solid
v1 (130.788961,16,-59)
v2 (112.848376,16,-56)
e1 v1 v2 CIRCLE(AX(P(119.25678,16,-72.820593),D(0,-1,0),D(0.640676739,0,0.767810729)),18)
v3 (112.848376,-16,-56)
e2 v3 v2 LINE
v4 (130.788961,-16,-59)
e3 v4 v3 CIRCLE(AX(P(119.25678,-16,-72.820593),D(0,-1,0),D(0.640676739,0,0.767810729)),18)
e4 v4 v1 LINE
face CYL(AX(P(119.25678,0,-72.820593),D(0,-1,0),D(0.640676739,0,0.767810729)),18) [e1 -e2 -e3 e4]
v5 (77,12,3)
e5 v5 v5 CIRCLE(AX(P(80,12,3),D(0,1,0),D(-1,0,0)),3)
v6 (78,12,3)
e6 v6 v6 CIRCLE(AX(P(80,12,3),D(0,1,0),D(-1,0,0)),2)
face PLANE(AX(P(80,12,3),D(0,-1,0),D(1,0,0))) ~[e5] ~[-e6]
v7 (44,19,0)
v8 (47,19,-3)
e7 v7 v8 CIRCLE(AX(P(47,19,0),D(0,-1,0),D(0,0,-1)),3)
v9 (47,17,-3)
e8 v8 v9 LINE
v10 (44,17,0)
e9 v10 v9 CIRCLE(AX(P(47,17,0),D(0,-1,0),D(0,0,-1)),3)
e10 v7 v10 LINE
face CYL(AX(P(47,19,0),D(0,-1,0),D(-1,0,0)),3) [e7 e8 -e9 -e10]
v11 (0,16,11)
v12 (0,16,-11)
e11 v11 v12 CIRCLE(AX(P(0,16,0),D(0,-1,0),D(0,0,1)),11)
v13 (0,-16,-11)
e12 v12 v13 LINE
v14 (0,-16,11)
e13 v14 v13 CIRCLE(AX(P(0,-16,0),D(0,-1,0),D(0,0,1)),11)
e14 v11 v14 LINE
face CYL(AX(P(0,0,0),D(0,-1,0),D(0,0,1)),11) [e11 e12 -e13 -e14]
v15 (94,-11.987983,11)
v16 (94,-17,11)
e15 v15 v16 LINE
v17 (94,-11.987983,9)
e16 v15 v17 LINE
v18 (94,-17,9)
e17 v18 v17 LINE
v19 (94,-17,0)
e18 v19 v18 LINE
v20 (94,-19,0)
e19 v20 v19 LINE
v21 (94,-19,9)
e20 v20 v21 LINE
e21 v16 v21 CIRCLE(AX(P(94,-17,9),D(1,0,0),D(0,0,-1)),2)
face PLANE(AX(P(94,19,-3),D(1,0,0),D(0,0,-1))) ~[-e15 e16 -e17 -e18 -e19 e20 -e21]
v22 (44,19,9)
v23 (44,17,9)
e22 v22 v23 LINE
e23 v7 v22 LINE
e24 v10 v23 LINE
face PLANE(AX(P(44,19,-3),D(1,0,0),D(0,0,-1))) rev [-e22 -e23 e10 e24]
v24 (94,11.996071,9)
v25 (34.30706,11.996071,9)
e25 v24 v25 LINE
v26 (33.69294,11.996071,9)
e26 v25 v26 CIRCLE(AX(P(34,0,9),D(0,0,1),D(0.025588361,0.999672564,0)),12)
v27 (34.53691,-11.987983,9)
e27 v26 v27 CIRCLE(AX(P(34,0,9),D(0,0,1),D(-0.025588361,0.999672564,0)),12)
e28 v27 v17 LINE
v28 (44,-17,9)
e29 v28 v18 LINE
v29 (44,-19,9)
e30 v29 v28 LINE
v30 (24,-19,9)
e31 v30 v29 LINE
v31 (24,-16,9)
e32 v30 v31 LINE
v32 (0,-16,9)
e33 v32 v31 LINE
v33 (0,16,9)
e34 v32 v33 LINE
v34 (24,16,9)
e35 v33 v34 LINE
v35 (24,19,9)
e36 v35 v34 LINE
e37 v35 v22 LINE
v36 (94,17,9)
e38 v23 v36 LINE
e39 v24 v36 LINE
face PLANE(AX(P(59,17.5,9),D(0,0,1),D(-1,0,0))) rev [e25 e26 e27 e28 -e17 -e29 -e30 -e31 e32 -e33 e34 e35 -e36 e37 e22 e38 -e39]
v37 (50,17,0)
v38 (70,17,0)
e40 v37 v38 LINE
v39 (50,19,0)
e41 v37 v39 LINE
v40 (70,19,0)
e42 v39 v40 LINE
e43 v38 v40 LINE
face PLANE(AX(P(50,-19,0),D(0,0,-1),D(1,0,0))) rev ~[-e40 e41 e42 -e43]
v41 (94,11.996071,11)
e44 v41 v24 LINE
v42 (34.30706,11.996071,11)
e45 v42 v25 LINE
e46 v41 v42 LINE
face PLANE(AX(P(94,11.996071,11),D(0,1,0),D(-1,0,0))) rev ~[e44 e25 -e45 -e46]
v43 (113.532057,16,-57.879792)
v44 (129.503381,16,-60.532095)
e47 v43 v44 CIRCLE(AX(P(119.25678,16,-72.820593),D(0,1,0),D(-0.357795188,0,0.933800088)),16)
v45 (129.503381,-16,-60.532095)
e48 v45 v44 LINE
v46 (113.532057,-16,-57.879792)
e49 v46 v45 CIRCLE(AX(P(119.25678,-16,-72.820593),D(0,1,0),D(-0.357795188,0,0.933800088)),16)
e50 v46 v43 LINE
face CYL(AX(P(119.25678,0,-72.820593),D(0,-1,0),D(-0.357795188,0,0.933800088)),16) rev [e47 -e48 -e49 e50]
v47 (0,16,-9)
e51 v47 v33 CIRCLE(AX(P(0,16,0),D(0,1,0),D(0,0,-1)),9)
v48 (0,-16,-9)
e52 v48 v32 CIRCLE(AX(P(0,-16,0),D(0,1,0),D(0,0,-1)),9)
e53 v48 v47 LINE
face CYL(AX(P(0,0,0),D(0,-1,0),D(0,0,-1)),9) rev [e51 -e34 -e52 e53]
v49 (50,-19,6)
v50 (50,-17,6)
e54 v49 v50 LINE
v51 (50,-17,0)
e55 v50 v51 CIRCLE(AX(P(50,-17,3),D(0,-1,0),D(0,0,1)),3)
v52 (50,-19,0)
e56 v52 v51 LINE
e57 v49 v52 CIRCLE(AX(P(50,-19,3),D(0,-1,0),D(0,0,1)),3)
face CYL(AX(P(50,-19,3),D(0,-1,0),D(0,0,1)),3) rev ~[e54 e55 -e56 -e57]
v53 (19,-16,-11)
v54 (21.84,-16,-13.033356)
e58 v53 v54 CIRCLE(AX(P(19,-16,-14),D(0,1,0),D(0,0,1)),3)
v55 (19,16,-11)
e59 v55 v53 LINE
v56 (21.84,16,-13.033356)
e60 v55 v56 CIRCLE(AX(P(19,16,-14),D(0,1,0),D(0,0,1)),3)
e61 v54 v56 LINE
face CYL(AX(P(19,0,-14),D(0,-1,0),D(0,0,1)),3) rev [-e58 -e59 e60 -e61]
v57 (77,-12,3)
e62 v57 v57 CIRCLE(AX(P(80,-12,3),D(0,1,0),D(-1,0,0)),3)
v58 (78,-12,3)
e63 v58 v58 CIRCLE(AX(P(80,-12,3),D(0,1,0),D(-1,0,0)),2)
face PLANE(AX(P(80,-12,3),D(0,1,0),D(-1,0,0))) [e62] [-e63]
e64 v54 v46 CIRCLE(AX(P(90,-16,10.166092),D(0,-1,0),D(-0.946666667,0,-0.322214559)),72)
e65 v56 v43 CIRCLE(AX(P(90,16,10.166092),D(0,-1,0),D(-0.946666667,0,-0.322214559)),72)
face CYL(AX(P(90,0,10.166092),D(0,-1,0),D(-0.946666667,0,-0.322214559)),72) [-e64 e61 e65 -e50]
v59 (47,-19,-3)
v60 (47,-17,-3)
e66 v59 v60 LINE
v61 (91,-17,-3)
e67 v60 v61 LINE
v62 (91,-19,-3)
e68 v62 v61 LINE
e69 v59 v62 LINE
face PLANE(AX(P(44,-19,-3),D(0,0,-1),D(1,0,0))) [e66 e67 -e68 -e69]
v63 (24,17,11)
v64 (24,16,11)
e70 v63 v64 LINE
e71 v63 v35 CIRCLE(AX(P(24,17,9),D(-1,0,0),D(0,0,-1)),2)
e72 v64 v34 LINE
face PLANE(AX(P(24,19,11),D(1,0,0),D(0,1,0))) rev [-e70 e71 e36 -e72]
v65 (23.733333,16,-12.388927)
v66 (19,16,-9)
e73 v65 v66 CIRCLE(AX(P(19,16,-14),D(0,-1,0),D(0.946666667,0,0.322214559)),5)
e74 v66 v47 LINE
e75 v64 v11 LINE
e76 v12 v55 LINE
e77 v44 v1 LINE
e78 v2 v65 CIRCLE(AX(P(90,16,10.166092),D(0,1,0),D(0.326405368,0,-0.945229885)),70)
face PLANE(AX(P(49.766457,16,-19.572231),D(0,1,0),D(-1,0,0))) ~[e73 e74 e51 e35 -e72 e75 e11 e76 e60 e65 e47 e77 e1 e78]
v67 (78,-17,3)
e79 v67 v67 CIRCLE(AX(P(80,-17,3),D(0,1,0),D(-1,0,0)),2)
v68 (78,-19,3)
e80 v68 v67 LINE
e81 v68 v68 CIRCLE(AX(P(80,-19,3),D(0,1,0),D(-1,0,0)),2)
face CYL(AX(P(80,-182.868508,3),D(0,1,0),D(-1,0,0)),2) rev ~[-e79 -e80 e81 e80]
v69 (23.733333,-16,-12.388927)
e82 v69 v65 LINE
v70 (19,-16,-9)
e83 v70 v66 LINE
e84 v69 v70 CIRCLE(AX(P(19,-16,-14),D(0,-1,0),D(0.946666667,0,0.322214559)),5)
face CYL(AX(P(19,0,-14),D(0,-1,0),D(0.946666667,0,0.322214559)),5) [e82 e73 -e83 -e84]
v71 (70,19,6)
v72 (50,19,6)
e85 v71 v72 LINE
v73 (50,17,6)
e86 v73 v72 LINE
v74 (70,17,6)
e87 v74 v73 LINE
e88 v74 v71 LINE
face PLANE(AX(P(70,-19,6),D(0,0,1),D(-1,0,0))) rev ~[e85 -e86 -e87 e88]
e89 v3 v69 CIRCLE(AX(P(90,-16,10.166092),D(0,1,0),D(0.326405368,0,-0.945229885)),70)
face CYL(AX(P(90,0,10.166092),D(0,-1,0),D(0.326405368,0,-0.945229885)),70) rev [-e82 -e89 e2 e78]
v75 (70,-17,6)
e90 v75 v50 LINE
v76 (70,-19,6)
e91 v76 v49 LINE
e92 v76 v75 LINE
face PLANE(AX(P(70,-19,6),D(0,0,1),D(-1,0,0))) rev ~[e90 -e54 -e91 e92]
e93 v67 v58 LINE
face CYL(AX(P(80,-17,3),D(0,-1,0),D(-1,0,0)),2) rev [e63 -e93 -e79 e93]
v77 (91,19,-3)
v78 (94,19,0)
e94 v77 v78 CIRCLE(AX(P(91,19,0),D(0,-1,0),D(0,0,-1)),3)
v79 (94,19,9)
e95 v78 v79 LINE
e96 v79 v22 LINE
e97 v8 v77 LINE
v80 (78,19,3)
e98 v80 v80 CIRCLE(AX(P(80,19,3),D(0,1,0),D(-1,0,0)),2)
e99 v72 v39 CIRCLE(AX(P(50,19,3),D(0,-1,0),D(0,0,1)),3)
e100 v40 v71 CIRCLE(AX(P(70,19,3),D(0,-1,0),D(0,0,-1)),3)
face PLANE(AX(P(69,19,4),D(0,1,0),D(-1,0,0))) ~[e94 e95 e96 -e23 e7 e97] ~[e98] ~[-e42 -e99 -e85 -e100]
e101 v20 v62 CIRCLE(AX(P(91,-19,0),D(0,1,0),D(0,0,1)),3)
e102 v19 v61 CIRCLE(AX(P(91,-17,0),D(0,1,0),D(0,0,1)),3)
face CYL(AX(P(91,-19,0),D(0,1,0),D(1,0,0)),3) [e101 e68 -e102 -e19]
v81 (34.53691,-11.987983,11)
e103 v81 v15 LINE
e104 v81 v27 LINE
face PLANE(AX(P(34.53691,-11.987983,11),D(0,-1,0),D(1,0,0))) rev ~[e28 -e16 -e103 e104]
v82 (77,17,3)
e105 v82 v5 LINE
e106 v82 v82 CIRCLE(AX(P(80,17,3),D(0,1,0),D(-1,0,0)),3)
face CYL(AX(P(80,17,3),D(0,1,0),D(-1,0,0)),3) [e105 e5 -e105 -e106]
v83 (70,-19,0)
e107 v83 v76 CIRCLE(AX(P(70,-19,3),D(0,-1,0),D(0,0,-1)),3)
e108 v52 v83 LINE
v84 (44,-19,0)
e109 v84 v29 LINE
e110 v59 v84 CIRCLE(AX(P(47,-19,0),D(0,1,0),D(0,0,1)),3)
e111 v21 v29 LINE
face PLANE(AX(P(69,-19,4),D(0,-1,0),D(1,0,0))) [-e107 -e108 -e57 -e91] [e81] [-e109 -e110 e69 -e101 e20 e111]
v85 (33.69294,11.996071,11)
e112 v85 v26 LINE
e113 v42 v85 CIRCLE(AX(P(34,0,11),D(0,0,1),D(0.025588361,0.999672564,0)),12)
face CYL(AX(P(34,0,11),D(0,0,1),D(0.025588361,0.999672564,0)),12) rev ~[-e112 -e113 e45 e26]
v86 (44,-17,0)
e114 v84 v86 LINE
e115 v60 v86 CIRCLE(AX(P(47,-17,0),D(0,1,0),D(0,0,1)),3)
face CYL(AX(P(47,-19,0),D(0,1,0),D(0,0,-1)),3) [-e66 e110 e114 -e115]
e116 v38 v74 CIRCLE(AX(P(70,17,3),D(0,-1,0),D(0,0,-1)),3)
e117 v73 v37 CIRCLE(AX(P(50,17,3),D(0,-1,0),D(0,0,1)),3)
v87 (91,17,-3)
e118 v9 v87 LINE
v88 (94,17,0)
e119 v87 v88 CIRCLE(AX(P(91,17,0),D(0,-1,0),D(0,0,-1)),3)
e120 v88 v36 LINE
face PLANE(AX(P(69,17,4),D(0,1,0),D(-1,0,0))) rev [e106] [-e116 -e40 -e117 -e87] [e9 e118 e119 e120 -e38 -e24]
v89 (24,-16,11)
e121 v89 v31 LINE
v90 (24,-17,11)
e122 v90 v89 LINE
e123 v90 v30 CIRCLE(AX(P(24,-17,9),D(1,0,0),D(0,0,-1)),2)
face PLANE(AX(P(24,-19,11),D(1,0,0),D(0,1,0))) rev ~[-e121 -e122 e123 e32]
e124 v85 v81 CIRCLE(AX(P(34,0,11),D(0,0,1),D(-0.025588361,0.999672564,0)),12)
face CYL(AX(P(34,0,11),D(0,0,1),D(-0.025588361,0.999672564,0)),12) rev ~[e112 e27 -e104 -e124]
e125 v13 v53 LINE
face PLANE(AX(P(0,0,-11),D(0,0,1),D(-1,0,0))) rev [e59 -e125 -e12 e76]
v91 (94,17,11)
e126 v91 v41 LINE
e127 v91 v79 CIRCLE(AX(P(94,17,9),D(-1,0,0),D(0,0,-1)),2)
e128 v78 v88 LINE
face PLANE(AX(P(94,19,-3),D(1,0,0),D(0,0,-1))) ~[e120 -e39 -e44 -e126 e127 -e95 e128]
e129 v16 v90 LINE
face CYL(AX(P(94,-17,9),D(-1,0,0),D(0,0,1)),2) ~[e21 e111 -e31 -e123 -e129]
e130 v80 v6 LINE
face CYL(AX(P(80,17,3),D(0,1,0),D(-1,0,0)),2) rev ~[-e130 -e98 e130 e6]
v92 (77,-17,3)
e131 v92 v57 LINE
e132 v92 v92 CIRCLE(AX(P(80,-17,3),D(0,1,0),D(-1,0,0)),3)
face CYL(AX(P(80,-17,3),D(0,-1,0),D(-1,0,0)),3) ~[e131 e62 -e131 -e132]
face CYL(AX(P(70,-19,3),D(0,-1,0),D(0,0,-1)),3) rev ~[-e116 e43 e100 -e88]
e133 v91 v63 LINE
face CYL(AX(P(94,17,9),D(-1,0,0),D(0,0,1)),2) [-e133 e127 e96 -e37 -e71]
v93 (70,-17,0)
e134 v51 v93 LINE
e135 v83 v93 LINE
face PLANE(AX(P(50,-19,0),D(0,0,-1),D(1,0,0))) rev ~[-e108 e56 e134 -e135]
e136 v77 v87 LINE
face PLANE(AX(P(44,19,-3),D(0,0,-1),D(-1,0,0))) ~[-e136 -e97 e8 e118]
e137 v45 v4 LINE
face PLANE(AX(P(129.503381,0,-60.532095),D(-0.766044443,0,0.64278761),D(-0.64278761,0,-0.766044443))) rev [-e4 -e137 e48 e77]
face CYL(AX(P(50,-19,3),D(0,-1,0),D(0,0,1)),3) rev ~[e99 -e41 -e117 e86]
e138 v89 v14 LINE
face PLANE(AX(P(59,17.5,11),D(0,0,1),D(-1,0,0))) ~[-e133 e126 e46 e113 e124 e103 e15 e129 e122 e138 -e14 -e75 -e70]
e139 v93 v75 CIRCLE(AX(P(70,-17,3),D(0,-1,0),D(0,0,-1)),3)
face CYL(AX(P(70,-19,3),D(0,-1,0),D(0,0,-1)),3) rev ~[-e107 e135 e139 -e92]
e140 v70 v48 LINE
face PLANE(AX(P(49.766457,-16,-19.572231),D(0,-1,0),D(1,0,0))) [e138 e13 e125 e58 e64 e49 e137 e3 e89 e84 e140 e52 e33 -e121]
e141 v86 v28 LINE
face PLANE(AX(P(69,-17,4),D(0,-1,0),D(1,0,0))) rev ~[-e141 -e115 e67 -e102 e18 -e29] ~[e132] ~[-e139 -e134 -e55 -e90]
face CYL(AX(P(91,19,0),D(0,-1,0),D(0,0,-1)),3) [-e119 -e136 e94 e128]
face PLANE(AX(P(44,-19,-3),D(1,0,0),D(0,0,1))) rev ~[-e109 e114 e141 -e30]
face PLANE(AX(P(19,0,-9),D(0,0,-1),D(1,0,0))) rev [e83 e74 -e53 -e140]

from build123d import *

# Parameters (mm, degrees)
F1_DEPTH  = 16
F2_W      = 70
F2_H      = 3
F3_DEPTH  = 2
F4_W      = 50
F4_H      = 14
F5_DEPTH  = 2
F6_R      = 2
F9_DEPTH  = 2
F11_DEPTH = 38.001
F13_D     = 4
F14_R     = 3
F14_R_2   = 2
F15_DEPTH = 5
F16_R     = 3


# Not quite as in the source:
# - a pattern or mirror of a feature is missing from the dataset's text; its kind, count and spacing are read off the source's solid


with BuildPart() as f1:
    # F0 (on Front) → F1 (new body)
    with BuildSketch(Plane.XZ):
        with BuildLine():
            ThreePointArc((0, -9), (-9, 0), (0, 9))
            Line((0, 9), (94, 9))
            Line((94, 9), (94, 11))
            Line((94, 11), (0, 11))
            ThreePointArc((0, 11), (-11, 0), (0, -11))
            Line((0, -11), (19, -11))
            ThreePointArc((19, -11), (20.7464347921, -11.5607448848), (21.84, -13.0333563221))
            ThreePointArc((21.84, -13.0333563221), (58.3659358906, -54.5122350868), (113.5320571839, -57.8797917247))
            ThreePointArc((113.5320571839, -57.8797917247), (121.8779484376, -57.0367571838), (129.5033807995, -60.5320954149))
            Line((129.5033807995, -60.5320954149), (130.788961497, -59))
            ThreePointArc((130.788961497, -59), (122.2254958147, -55.0670941025), (112.8483757943, -56))
            ThreePointArc((112.8483757943, -56), (59.2303979034, -52.7086373708), (23.7333333333, -12.3889272035))
            ThreePointArc((23.7333333333, -12.3889272035), (21.9107246536, -9.9345748081), (19, -9))
            Line((19, -9), (0, -9))
        make_face()
    extrude(amount=F1_DEPTH)

    # F2 (on face) → F3 (join)
    with BuildSketch(Plane.XY.offset(11)):
        with Locations((59, -17.5)):
            Rectangle(F2_W, F2_H)
    extrude(amount=-F3_DEPTH)

    # F4 (on face) → F5 (join)
    with BuildSketch(Plane.XZ.offset(19)):
        with Locations((69, 4)):
            Rectangle(F4_W, F4_H)
    extrude(amount=-F5_DEPTH)

    # F6
    f6_edges = [f1.edges().sort_by_distance(p)[0] for p in [
        (59, -19, 11),
    ]]
    fillet(f6_edges, radius=F6_R)

    # F7: F1 across plane


with BuildPart() as f1_1:
    add(f1.part)
    add(f1.part.mirror(Plane.XZ))

    # F8 (on face) → F9 (cut)
    with BuildSketch(Plane.XY.offset(11)):
        with BuildLine():
            Line((33.6929396674, 11.9960707714), (34.3070603326, 11.9960707714))
            ThreePointArc((34.3070603326, 11.9960707714), (34, 12), (33.6929396674, 11.9960707714))
        make_face()
        with BuildLine():
            Line((94, 11.9960707714), (34.3070603326, 11.9960707714))
            Line((34.3070603326, 11.9960707714), (33.6929396674, 11.9960707714))
            ThreePointArc((33.6929396674, 11.9960707714), (22.0074226206, -0.4220045025), (34.5369099172, -11.9879826385))
            Line((34.5369099172, -11.9879826385), (94, -11.9879826385))
            Line((94, -11.9879826385), (94, 11.9960707714))
        make_face()
    extrude(amount=-F9_DEPTH, mode=Mode.SUBTRACT)

    # F10 (on face) → F11 (cut, through all)
    with BuildSketch(Plane.XZ.offset(19)):
        with BuildLine():
            ThreePointArc((50, 6), (47, 3), (50, 0))
            Line((50, 0), (70, 0))
            ThreePointArc((70, 0), (73, 3), (70, 6))
            Line((70, 6), (50, 6))
        make_face()
    extrude(amount=-F11_DEPTH, mode=Mode.SUBTRACT)

    # F13 (through all)
    with Locations(Plane.XZ.offset(19)):
        with Locations((80, 3)):
            Hole(F13_D / 2)

    # F14 (on face) → F15 (join)
    with BuildSketch(Plane(origin=(0, -17, 0), x_dir=(-1, 0, 0), z_dir=(0, 1, 0))):
        with Locations((-80, 3)):
            Circle(F14_R)
        with Locations((-80, 3)):
            Circle(F14_R_2, mode=Mode.SUBTRACT)
    f15 = extrude(amount=F15_DEPTH)

    # F15_copies: F15 across plane
    add(f15.mirror(Plane.ZX))

    # F16
    f16_edges = [f1_1.edges().sort_by_distance(p)[0] for p in [
        (44, 18, -3),
        (44, -18, -3),
        (94, 18, -3),
        (94, -18, -3),
    ]]
    fillet(f16_edges, radius=F16_R)


solid = f1_1.part
